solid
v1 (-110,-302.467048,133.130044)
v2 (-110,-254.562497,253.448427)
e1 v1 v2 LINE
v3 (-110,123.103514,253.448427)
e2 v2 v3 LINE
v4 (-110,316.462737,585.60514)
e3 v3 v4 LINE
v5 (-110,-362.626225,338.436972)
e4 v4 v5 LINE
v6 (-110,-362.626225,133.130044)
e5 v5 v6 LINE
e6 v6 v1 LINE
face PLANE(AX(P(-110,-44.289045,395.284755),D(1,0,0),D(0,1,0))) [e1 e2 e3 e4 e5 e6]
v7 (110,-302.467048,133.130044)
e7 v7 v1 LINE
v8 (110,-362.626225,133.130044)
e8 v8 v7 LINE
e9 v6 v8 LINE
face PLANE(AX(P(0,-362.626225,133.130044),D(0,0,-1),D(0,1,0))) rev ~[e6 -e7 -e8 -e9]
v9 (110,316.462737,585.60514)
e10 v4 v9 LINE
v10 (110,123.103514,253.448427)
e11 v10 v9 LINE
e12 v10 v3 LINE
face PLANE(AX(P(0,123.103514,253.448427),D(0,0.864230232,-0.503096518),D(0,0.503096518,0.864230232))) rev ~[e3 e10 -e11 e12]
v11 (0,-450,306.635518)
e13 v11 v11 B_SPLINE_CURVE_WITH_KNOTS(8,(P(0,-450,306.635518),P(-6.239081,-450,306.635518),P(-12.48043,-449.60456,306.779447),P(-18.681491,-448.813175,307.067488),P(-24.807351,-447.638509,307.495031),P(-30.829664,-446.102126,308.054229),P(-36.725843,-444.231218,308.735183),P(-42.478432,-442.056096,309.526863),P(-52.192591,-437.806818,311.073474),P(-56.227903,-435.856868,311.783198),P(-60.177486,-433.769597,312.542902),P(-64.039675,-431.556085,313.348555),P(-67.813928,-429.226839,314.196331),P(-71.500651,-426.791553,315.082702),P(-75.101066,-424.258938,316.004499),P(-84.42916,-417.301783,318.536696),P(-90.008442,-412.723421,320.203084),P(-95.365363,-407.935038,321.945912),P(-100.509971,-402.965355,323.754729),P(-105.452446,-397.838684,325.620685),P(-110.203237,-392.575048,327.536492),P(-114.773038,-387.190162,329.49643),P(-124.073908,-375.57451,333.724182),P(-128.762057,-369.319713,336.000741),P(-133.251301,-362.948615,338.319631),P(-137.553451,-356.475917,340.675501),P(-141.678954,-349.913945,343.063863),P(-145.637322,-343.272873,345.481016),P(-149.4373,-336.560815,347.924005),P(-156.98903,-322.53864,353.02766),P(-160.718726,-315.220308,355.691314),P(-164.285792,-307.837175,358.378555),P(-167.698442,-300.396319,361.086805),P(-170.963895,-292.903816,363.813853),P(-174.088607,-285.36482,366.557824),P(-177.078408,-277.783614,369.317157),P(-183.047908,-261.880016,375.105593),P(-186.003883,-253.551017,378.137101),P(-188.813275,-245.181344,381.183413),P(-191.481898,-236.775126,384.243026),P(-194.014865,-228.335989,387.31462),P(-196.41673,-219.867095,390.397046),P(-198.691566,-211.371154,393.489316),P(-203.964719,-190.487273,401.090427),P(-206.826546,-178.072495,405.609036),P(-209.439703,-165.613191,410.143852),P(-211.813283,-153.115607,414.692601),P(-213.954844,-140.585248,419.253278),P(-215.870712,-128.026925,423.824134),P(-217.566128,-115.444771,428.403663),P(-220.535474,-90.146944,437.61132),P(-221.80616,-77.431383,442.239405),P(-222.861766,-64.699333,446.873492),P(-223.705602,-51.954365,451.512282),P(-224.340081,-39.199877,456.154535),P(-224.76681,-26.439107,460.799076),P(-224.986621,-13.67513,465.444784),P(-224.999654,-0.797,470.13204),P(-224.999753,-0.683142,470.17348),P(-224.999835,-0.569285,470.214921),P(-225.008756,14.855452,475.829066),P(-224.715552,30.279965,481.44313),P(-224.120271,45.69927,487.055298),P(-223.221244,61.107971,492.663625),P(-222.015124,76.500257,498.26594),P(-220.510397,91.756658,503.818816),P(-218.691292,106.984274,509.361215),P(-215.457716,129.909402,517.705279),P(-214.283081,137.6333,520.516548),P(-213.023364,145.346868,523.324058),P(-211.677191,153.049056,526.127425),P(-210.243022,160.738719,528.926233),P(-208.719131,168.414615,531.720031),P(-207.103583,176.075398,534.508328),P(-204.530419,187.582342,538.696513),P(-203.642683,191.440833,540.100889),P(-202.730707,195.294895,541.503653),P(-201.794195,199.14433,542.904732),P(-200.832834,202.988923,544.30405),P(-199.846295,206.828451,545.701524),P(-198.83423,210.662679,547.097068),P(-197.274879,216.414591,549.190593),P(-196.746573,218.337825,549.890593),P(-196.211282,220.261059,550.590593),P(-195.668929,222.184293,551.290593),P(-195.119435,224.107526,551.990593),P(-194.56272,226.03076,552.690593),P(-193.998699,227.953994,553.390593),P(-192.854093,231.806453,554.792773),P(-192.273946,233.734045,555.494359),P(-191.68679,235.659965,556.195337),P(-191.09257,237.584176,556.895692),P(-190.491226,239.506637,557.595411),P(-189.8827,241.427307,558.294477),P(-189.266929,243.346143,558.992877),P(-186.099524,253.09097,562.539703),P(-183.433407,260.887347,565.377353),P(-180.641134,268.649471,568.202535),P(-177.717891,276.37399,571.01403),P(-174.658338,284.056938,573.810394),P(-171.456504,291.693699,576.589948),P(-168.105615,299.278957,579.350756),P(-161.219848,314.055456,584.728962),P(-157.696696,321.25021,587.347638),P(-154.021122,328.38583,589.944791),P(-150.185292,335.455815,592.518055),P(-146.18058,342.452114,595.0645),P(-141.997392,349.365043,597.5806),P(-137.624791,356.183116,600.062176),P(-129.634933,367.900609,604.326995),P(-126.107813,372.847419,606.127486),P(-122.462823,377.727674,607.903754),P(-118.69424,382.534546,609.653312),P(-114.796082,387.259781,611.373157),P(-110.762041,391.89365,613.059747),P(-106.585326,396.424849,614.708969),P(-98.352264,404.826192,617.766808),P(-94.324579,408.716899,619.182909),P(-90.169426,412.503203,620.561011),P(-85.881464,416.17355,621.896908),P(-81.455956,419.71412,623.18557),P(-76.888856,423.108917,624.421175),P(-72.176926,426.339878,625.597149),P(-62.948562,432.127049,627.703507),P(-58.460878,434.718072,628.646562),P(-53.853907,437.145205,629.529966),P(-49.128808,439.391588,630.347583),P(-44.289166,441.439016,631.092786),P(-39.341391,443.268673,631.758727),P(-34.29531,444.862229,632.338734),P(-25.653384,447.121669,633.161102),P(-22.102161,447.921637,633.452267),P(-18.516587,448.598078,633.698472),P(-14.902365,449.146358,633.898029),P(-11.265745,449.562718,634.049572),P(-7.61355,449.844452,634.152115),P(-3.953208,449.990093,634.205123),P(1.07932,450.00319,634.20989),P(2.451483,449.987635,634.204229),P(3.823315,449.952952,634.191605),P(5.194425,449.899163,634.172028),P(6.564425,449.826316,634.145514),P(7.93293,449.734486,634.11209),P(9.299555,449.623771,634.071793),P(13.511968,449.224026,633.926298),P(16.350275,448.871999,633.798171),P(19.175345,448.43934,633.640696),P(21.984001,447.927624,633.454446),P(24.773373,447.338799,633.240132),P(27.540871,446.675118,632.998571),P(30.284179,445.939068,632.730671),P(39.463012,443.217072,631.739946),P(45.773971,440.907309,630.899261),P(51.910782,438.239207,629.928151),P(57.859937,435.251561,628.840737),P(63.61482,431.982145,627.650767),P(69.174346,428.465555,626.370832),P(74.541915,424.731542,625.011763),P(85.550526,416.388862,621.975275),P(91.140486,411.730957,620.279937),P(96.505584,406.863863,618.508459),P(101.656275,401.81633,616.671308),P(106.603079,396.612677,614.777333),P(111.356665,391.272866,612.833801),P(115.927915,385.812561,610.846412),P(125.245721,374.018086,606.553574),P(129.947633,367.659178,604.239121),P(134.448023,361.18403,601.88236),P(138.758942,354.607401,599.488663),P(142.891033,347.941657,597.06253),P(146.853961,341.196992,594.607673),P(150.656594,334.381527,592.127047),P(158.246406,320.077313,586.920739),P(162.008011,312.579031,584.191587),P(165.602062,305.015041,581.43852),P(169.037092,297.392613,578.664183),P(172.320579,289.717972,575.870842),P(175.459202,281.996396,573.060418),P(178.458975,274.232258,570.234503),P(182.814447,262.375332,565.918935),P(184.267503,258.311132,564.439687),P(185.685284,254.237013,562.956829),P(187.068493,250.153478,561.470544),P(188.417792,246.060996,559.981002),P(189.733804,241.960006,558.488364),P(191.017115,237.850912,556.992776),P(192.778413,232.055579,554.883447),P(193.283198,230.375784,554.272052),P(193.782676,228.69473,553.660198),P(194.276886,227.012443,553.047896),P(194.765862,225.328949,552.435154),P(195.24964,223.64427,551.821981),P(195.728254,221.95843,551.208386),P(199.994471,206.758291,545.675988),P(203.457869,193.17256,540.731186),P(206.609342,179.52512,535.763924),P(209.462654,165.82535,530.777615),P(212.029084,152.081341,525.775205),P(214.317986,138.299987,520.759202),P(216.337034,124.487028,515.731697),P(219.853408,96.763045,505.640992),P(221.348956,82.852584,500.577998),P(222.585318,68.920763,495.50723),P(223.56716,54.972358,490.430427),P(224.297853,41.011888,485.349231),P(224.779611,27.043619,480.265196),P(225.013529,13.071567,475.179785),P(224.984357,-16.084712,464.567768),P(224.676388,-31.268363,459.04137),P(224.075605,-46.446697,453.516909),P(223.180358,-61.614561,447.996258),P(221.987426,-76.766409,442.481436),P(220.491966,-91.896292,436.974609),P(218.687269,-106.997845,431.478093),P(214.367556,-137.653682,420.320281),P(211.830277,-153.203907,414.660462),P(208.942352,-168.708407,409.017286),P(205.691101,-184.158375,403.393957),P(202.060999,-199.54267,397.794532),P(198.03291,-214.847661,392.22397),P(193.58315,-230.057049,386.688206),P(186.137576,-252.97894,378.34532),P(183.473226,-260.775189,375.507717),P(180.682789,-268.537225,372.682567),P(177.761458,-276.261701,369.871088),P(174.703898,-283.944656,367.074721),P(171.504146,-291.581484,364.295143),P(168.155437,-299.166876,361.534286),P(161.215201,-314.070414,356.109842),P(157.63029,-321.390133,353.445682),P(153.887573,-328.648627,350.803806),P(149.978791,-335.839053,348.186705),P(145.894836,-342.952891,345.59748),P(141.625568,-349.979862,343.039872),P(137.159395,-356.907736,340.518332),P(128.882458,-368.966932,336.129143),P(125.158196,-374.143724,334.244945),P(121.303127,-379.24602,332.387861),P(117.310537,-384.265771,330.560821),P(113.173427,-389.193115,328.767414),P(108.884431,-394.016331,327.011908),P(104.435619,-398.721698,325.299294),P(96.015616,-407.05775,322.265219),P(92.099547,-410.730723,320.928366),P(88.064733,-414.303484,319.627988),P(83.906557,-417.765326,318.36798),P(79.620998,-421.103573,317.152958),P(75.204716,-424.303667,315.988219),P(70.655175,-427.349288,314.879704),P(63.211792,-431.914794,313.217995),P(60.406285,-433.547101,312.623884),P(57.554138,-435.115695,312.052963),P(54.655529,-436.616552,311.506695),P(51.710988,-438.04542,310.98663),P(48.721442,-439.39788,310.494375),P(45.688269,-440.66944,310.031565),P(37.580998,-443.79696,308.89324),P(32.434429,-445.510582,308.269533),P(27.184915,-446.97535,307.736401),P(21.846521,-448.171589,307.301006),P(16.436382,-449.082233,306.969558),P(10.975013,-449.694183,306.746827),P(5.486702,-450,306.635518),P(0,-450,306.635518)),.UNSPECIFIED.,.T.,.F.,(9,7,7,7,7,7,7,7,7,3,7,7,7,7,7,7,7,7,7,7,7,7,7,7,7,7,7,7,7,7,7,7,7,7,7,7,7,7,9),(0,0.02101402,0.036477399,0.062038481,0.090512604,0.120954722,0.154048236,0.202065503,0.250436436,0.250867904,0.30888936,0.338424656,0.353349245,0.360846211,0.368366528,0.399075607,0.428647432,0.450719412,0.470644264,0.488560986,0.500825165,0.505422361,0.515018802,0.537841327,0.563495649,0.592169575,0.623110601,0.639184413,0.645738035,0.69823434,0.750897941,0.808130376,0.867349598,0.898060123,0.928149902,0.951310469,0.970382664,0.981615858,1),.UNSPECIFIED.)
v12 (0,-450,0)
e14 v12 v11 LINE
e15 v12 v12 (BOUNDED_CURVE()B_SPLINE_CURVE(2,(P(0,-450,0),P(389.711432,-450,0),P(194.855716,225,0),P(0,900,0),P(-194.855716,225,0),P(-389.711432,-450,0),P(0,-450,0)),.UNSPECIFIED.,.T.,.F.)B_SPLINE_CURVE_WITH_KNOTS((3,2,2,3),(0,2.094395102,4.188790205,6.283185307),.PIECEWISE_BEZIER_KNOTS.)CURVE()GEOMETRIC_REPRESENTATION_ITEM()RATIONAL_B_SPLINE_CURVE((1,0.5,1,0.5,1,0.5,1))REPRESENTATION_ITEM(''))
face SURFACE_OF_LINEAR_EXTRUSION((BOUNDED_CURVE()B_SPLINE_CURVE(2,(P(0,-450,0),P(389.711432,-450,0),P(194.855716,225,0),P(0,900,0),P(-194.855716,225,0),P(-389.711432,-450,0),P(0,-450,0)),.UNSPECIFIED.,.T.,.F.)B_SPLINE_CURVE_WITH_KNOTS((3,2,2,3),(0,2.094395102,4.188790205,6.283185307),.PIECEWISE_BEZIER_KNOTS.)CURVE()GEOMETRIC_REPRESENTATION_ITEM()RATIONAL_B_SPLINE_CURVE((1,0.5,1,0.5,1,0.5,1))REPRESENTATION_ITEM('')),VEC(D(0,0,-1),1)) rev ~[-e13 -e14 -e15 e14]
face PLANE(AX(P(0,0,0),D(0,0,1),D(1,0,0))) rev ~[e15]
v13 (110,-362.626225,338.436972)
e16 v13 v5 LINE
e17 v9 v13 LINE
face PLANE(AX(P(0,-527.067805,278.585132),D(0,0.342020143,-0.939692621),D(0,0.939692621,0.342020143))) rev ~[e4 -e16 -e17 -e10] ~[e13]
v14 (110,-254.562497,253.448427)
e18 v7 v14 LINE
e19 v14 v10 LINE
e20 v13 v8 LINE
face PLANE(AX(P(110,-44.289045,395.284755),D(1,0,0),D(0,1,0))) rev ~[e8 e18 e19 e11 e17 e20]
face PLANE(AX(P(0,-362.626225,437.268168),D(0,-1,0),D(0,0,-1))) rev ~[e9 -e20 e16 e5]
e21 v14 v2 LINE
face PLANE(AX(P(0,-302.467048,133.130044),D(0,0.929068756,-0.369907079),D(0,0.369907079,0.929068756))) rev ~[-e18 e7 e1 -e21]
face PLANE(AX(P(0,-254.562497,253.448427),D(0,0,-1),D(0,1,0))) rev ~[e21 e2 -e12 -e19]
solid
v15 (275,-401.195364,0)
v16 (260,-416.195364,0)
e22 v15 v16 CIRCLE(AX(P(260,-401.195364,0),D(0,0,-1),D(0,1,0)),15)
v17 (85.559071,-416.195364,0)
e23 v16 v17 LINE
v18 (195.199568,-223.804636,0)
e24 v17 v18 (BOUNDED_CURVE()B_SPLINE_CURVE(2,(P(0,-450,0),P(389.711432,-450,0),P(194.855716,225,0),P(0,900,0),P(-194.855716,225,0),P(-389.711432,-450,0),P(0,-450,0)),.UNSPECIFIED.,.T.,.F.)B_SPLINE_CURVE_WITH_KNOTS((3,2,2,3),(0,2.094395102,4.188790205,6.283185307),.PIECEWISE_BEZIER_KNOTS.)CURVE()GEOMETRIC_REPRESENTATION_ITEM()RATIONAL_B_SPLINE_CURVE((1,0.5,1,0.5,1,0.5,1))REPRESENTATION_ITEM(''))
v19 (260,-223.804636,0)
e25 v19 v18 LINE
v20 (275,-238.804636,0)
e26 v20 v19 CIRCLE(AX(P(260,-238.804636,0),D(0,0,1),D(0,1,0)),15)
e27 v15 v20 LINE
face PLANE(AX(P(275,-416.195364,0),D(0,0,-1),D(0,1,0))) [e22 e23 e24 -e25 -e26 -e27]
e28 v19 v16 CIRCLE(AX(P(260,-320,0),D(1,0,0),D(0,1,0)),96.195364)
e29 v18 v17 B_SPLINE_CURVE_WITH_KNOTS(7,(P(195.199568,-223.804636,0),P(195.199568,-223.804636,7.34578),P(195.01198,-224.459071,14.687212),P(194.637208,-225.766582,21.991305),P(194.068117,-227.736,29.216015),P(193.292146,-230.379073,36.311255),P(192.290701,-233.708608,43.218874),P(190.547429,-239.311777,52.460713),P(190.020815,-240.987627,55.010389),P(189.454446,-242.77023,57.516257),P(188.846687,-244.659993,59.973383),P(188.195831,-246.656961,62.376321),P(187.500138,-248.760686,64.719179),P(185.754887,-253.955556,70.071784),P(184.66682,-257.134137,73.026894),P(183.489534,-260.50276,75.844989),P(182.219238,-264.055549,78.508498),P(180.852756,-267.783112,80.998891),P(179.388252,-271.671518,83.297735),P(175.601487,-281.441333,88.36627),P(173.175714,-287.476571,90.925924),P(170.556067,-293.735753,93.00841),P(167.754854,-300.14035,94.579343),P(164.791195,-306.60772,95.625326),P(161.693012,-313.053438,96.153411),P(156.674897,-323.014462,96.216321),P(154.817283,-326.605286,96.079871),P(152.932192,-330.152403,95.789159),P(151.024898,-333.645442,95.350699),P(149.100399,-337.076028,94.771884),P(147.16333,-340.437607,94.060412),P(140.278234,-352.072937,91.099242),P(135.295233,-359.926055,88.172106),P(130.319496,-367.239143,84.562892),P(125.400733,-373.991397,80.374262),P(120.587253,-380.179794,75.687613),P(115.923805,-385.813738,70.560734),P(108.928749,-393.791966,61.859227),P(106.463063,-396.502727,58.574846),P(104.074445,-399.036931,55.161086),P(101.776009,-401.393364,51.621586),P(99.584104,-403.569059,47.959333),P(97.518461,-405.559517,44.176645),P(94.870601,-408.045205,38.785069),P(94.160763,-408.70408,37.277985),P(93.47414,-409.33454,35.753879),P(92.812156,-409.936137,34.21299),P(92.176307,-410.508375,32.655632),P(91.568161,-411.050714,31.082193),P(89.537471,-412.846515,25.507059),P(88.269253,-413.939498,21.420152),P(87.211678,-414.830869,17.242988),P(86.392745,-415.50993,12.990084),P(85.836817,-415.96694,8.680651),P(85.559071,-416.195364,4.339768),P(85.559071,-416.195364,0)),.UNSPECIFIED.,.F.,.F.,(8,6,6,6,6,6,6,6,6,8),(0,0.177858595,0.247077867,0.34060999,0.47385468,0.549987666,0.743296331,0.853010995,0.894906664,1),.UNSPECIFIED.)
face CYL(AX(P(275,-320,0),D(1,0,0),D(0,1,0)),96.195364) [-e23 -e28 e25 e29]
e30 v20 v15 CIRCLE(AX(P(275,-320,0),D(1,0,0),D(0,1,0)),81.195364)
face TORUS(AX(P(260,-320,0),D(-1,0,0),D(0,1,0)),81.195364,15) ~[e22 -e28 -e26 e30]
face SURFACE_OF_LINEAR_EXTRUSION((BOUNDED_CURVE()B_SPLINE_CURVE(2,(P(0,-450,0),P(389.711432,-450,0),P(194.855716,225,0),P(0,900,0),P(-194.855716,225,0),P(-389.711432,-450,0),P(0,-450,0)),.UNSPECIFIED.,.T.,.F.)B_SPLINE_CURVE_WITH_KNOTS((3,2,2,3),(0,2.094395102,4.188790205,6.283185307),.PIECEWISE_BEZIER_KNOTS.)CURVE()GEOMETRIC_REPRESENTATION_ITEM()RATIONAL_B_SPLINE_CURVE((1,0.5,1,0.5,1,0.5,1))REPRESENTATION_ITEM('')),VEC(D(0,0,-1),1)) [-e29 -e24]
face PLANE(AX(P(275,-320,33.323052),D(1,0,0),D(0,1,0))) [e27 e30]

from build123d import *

# Parameters (mm, degrees)
F1_DEPTH = 700
F3_DEPTH = 225
F7_R     = 15
F9_DEPTH = 110


with BuildPart() as f1:
    # F0 (on Top) → F1 (new body)
    with BuildSketch(Plane.XY):
        with BuildLine():
            add(Edge.make_bspline(
                [(0, -450), (389.711431703, -450), (194.8557158515, 225), (0, 900), (-194.8557158515, 225), (-389.711431703, -450), (0, -450)],
                knots=[0, 0, 0, 2.0943951024, 2.0943951024, 4.1887902048, 4.1887902048, 6.2831853072, 6.2831853072, 6.2831853072], degree=2, weights=[1, 0.5, 1, 0.5, 1, 0.5, 1]))
        make_face()
    extrude(amount=F1_DEPTH)

    # F2 (on Right) → F3 (cut, symmetric)
    with BuildSketch(Plane.YZ):
        Polygon((-527.0678045979, 278.585131589), (484.6267700195, 646.8118429184), (306.4921150317, 1136.2327851199), (-705.2024595858, 768.0060737906), align=None)
    extrude(amount=F3_DEPTH, both=True, mode=Mode.SUBTRACT)


with BuildPart() as f6:
    # F5 (on offset) → F6 (new body, up to the next surface of F1)
    with BuildSketch(Plane.YZ.offset(275)):
        with BuildLine():
            Line((-416.1953643573, 0), (-223.8046356427, 0))
            ThreePointArc((-223.8046356427, 0), (-320, 96.1953643573), (-416.1953643573, 0))
        make_face()
    extrude(until=Until.NEXT, target=f1.part, dir=(-1, 0, 0))

    # F7
    f7_edges = [f6.edges().sort_by_distance(p)[0] for p in [
        (275, -320, 96.195364),
    ]]
    fillet(f7_edges, radius=F7_R)


with BuildPart() as f1_1:
    add(f1.part)

    # F8 (on Right) → F9 (cut, symmetric)
    with BuildSketch(Plane.YZ):
        Polygon((123.1035143137, 253.4484267235), (348.1434285641, 640.0269269943), (-362.6262247562, 437.2681677341), (-362.6262247562, 133.130043745), (-302.4670481682, 133.130043745), (-254.562497139, 253.4484267235), align=None)
    extrude(amount=F9_DEPTH, both=True, mode=Mode.SUBTRACT)


solid = Compound([f6.part, f1_1.part])
